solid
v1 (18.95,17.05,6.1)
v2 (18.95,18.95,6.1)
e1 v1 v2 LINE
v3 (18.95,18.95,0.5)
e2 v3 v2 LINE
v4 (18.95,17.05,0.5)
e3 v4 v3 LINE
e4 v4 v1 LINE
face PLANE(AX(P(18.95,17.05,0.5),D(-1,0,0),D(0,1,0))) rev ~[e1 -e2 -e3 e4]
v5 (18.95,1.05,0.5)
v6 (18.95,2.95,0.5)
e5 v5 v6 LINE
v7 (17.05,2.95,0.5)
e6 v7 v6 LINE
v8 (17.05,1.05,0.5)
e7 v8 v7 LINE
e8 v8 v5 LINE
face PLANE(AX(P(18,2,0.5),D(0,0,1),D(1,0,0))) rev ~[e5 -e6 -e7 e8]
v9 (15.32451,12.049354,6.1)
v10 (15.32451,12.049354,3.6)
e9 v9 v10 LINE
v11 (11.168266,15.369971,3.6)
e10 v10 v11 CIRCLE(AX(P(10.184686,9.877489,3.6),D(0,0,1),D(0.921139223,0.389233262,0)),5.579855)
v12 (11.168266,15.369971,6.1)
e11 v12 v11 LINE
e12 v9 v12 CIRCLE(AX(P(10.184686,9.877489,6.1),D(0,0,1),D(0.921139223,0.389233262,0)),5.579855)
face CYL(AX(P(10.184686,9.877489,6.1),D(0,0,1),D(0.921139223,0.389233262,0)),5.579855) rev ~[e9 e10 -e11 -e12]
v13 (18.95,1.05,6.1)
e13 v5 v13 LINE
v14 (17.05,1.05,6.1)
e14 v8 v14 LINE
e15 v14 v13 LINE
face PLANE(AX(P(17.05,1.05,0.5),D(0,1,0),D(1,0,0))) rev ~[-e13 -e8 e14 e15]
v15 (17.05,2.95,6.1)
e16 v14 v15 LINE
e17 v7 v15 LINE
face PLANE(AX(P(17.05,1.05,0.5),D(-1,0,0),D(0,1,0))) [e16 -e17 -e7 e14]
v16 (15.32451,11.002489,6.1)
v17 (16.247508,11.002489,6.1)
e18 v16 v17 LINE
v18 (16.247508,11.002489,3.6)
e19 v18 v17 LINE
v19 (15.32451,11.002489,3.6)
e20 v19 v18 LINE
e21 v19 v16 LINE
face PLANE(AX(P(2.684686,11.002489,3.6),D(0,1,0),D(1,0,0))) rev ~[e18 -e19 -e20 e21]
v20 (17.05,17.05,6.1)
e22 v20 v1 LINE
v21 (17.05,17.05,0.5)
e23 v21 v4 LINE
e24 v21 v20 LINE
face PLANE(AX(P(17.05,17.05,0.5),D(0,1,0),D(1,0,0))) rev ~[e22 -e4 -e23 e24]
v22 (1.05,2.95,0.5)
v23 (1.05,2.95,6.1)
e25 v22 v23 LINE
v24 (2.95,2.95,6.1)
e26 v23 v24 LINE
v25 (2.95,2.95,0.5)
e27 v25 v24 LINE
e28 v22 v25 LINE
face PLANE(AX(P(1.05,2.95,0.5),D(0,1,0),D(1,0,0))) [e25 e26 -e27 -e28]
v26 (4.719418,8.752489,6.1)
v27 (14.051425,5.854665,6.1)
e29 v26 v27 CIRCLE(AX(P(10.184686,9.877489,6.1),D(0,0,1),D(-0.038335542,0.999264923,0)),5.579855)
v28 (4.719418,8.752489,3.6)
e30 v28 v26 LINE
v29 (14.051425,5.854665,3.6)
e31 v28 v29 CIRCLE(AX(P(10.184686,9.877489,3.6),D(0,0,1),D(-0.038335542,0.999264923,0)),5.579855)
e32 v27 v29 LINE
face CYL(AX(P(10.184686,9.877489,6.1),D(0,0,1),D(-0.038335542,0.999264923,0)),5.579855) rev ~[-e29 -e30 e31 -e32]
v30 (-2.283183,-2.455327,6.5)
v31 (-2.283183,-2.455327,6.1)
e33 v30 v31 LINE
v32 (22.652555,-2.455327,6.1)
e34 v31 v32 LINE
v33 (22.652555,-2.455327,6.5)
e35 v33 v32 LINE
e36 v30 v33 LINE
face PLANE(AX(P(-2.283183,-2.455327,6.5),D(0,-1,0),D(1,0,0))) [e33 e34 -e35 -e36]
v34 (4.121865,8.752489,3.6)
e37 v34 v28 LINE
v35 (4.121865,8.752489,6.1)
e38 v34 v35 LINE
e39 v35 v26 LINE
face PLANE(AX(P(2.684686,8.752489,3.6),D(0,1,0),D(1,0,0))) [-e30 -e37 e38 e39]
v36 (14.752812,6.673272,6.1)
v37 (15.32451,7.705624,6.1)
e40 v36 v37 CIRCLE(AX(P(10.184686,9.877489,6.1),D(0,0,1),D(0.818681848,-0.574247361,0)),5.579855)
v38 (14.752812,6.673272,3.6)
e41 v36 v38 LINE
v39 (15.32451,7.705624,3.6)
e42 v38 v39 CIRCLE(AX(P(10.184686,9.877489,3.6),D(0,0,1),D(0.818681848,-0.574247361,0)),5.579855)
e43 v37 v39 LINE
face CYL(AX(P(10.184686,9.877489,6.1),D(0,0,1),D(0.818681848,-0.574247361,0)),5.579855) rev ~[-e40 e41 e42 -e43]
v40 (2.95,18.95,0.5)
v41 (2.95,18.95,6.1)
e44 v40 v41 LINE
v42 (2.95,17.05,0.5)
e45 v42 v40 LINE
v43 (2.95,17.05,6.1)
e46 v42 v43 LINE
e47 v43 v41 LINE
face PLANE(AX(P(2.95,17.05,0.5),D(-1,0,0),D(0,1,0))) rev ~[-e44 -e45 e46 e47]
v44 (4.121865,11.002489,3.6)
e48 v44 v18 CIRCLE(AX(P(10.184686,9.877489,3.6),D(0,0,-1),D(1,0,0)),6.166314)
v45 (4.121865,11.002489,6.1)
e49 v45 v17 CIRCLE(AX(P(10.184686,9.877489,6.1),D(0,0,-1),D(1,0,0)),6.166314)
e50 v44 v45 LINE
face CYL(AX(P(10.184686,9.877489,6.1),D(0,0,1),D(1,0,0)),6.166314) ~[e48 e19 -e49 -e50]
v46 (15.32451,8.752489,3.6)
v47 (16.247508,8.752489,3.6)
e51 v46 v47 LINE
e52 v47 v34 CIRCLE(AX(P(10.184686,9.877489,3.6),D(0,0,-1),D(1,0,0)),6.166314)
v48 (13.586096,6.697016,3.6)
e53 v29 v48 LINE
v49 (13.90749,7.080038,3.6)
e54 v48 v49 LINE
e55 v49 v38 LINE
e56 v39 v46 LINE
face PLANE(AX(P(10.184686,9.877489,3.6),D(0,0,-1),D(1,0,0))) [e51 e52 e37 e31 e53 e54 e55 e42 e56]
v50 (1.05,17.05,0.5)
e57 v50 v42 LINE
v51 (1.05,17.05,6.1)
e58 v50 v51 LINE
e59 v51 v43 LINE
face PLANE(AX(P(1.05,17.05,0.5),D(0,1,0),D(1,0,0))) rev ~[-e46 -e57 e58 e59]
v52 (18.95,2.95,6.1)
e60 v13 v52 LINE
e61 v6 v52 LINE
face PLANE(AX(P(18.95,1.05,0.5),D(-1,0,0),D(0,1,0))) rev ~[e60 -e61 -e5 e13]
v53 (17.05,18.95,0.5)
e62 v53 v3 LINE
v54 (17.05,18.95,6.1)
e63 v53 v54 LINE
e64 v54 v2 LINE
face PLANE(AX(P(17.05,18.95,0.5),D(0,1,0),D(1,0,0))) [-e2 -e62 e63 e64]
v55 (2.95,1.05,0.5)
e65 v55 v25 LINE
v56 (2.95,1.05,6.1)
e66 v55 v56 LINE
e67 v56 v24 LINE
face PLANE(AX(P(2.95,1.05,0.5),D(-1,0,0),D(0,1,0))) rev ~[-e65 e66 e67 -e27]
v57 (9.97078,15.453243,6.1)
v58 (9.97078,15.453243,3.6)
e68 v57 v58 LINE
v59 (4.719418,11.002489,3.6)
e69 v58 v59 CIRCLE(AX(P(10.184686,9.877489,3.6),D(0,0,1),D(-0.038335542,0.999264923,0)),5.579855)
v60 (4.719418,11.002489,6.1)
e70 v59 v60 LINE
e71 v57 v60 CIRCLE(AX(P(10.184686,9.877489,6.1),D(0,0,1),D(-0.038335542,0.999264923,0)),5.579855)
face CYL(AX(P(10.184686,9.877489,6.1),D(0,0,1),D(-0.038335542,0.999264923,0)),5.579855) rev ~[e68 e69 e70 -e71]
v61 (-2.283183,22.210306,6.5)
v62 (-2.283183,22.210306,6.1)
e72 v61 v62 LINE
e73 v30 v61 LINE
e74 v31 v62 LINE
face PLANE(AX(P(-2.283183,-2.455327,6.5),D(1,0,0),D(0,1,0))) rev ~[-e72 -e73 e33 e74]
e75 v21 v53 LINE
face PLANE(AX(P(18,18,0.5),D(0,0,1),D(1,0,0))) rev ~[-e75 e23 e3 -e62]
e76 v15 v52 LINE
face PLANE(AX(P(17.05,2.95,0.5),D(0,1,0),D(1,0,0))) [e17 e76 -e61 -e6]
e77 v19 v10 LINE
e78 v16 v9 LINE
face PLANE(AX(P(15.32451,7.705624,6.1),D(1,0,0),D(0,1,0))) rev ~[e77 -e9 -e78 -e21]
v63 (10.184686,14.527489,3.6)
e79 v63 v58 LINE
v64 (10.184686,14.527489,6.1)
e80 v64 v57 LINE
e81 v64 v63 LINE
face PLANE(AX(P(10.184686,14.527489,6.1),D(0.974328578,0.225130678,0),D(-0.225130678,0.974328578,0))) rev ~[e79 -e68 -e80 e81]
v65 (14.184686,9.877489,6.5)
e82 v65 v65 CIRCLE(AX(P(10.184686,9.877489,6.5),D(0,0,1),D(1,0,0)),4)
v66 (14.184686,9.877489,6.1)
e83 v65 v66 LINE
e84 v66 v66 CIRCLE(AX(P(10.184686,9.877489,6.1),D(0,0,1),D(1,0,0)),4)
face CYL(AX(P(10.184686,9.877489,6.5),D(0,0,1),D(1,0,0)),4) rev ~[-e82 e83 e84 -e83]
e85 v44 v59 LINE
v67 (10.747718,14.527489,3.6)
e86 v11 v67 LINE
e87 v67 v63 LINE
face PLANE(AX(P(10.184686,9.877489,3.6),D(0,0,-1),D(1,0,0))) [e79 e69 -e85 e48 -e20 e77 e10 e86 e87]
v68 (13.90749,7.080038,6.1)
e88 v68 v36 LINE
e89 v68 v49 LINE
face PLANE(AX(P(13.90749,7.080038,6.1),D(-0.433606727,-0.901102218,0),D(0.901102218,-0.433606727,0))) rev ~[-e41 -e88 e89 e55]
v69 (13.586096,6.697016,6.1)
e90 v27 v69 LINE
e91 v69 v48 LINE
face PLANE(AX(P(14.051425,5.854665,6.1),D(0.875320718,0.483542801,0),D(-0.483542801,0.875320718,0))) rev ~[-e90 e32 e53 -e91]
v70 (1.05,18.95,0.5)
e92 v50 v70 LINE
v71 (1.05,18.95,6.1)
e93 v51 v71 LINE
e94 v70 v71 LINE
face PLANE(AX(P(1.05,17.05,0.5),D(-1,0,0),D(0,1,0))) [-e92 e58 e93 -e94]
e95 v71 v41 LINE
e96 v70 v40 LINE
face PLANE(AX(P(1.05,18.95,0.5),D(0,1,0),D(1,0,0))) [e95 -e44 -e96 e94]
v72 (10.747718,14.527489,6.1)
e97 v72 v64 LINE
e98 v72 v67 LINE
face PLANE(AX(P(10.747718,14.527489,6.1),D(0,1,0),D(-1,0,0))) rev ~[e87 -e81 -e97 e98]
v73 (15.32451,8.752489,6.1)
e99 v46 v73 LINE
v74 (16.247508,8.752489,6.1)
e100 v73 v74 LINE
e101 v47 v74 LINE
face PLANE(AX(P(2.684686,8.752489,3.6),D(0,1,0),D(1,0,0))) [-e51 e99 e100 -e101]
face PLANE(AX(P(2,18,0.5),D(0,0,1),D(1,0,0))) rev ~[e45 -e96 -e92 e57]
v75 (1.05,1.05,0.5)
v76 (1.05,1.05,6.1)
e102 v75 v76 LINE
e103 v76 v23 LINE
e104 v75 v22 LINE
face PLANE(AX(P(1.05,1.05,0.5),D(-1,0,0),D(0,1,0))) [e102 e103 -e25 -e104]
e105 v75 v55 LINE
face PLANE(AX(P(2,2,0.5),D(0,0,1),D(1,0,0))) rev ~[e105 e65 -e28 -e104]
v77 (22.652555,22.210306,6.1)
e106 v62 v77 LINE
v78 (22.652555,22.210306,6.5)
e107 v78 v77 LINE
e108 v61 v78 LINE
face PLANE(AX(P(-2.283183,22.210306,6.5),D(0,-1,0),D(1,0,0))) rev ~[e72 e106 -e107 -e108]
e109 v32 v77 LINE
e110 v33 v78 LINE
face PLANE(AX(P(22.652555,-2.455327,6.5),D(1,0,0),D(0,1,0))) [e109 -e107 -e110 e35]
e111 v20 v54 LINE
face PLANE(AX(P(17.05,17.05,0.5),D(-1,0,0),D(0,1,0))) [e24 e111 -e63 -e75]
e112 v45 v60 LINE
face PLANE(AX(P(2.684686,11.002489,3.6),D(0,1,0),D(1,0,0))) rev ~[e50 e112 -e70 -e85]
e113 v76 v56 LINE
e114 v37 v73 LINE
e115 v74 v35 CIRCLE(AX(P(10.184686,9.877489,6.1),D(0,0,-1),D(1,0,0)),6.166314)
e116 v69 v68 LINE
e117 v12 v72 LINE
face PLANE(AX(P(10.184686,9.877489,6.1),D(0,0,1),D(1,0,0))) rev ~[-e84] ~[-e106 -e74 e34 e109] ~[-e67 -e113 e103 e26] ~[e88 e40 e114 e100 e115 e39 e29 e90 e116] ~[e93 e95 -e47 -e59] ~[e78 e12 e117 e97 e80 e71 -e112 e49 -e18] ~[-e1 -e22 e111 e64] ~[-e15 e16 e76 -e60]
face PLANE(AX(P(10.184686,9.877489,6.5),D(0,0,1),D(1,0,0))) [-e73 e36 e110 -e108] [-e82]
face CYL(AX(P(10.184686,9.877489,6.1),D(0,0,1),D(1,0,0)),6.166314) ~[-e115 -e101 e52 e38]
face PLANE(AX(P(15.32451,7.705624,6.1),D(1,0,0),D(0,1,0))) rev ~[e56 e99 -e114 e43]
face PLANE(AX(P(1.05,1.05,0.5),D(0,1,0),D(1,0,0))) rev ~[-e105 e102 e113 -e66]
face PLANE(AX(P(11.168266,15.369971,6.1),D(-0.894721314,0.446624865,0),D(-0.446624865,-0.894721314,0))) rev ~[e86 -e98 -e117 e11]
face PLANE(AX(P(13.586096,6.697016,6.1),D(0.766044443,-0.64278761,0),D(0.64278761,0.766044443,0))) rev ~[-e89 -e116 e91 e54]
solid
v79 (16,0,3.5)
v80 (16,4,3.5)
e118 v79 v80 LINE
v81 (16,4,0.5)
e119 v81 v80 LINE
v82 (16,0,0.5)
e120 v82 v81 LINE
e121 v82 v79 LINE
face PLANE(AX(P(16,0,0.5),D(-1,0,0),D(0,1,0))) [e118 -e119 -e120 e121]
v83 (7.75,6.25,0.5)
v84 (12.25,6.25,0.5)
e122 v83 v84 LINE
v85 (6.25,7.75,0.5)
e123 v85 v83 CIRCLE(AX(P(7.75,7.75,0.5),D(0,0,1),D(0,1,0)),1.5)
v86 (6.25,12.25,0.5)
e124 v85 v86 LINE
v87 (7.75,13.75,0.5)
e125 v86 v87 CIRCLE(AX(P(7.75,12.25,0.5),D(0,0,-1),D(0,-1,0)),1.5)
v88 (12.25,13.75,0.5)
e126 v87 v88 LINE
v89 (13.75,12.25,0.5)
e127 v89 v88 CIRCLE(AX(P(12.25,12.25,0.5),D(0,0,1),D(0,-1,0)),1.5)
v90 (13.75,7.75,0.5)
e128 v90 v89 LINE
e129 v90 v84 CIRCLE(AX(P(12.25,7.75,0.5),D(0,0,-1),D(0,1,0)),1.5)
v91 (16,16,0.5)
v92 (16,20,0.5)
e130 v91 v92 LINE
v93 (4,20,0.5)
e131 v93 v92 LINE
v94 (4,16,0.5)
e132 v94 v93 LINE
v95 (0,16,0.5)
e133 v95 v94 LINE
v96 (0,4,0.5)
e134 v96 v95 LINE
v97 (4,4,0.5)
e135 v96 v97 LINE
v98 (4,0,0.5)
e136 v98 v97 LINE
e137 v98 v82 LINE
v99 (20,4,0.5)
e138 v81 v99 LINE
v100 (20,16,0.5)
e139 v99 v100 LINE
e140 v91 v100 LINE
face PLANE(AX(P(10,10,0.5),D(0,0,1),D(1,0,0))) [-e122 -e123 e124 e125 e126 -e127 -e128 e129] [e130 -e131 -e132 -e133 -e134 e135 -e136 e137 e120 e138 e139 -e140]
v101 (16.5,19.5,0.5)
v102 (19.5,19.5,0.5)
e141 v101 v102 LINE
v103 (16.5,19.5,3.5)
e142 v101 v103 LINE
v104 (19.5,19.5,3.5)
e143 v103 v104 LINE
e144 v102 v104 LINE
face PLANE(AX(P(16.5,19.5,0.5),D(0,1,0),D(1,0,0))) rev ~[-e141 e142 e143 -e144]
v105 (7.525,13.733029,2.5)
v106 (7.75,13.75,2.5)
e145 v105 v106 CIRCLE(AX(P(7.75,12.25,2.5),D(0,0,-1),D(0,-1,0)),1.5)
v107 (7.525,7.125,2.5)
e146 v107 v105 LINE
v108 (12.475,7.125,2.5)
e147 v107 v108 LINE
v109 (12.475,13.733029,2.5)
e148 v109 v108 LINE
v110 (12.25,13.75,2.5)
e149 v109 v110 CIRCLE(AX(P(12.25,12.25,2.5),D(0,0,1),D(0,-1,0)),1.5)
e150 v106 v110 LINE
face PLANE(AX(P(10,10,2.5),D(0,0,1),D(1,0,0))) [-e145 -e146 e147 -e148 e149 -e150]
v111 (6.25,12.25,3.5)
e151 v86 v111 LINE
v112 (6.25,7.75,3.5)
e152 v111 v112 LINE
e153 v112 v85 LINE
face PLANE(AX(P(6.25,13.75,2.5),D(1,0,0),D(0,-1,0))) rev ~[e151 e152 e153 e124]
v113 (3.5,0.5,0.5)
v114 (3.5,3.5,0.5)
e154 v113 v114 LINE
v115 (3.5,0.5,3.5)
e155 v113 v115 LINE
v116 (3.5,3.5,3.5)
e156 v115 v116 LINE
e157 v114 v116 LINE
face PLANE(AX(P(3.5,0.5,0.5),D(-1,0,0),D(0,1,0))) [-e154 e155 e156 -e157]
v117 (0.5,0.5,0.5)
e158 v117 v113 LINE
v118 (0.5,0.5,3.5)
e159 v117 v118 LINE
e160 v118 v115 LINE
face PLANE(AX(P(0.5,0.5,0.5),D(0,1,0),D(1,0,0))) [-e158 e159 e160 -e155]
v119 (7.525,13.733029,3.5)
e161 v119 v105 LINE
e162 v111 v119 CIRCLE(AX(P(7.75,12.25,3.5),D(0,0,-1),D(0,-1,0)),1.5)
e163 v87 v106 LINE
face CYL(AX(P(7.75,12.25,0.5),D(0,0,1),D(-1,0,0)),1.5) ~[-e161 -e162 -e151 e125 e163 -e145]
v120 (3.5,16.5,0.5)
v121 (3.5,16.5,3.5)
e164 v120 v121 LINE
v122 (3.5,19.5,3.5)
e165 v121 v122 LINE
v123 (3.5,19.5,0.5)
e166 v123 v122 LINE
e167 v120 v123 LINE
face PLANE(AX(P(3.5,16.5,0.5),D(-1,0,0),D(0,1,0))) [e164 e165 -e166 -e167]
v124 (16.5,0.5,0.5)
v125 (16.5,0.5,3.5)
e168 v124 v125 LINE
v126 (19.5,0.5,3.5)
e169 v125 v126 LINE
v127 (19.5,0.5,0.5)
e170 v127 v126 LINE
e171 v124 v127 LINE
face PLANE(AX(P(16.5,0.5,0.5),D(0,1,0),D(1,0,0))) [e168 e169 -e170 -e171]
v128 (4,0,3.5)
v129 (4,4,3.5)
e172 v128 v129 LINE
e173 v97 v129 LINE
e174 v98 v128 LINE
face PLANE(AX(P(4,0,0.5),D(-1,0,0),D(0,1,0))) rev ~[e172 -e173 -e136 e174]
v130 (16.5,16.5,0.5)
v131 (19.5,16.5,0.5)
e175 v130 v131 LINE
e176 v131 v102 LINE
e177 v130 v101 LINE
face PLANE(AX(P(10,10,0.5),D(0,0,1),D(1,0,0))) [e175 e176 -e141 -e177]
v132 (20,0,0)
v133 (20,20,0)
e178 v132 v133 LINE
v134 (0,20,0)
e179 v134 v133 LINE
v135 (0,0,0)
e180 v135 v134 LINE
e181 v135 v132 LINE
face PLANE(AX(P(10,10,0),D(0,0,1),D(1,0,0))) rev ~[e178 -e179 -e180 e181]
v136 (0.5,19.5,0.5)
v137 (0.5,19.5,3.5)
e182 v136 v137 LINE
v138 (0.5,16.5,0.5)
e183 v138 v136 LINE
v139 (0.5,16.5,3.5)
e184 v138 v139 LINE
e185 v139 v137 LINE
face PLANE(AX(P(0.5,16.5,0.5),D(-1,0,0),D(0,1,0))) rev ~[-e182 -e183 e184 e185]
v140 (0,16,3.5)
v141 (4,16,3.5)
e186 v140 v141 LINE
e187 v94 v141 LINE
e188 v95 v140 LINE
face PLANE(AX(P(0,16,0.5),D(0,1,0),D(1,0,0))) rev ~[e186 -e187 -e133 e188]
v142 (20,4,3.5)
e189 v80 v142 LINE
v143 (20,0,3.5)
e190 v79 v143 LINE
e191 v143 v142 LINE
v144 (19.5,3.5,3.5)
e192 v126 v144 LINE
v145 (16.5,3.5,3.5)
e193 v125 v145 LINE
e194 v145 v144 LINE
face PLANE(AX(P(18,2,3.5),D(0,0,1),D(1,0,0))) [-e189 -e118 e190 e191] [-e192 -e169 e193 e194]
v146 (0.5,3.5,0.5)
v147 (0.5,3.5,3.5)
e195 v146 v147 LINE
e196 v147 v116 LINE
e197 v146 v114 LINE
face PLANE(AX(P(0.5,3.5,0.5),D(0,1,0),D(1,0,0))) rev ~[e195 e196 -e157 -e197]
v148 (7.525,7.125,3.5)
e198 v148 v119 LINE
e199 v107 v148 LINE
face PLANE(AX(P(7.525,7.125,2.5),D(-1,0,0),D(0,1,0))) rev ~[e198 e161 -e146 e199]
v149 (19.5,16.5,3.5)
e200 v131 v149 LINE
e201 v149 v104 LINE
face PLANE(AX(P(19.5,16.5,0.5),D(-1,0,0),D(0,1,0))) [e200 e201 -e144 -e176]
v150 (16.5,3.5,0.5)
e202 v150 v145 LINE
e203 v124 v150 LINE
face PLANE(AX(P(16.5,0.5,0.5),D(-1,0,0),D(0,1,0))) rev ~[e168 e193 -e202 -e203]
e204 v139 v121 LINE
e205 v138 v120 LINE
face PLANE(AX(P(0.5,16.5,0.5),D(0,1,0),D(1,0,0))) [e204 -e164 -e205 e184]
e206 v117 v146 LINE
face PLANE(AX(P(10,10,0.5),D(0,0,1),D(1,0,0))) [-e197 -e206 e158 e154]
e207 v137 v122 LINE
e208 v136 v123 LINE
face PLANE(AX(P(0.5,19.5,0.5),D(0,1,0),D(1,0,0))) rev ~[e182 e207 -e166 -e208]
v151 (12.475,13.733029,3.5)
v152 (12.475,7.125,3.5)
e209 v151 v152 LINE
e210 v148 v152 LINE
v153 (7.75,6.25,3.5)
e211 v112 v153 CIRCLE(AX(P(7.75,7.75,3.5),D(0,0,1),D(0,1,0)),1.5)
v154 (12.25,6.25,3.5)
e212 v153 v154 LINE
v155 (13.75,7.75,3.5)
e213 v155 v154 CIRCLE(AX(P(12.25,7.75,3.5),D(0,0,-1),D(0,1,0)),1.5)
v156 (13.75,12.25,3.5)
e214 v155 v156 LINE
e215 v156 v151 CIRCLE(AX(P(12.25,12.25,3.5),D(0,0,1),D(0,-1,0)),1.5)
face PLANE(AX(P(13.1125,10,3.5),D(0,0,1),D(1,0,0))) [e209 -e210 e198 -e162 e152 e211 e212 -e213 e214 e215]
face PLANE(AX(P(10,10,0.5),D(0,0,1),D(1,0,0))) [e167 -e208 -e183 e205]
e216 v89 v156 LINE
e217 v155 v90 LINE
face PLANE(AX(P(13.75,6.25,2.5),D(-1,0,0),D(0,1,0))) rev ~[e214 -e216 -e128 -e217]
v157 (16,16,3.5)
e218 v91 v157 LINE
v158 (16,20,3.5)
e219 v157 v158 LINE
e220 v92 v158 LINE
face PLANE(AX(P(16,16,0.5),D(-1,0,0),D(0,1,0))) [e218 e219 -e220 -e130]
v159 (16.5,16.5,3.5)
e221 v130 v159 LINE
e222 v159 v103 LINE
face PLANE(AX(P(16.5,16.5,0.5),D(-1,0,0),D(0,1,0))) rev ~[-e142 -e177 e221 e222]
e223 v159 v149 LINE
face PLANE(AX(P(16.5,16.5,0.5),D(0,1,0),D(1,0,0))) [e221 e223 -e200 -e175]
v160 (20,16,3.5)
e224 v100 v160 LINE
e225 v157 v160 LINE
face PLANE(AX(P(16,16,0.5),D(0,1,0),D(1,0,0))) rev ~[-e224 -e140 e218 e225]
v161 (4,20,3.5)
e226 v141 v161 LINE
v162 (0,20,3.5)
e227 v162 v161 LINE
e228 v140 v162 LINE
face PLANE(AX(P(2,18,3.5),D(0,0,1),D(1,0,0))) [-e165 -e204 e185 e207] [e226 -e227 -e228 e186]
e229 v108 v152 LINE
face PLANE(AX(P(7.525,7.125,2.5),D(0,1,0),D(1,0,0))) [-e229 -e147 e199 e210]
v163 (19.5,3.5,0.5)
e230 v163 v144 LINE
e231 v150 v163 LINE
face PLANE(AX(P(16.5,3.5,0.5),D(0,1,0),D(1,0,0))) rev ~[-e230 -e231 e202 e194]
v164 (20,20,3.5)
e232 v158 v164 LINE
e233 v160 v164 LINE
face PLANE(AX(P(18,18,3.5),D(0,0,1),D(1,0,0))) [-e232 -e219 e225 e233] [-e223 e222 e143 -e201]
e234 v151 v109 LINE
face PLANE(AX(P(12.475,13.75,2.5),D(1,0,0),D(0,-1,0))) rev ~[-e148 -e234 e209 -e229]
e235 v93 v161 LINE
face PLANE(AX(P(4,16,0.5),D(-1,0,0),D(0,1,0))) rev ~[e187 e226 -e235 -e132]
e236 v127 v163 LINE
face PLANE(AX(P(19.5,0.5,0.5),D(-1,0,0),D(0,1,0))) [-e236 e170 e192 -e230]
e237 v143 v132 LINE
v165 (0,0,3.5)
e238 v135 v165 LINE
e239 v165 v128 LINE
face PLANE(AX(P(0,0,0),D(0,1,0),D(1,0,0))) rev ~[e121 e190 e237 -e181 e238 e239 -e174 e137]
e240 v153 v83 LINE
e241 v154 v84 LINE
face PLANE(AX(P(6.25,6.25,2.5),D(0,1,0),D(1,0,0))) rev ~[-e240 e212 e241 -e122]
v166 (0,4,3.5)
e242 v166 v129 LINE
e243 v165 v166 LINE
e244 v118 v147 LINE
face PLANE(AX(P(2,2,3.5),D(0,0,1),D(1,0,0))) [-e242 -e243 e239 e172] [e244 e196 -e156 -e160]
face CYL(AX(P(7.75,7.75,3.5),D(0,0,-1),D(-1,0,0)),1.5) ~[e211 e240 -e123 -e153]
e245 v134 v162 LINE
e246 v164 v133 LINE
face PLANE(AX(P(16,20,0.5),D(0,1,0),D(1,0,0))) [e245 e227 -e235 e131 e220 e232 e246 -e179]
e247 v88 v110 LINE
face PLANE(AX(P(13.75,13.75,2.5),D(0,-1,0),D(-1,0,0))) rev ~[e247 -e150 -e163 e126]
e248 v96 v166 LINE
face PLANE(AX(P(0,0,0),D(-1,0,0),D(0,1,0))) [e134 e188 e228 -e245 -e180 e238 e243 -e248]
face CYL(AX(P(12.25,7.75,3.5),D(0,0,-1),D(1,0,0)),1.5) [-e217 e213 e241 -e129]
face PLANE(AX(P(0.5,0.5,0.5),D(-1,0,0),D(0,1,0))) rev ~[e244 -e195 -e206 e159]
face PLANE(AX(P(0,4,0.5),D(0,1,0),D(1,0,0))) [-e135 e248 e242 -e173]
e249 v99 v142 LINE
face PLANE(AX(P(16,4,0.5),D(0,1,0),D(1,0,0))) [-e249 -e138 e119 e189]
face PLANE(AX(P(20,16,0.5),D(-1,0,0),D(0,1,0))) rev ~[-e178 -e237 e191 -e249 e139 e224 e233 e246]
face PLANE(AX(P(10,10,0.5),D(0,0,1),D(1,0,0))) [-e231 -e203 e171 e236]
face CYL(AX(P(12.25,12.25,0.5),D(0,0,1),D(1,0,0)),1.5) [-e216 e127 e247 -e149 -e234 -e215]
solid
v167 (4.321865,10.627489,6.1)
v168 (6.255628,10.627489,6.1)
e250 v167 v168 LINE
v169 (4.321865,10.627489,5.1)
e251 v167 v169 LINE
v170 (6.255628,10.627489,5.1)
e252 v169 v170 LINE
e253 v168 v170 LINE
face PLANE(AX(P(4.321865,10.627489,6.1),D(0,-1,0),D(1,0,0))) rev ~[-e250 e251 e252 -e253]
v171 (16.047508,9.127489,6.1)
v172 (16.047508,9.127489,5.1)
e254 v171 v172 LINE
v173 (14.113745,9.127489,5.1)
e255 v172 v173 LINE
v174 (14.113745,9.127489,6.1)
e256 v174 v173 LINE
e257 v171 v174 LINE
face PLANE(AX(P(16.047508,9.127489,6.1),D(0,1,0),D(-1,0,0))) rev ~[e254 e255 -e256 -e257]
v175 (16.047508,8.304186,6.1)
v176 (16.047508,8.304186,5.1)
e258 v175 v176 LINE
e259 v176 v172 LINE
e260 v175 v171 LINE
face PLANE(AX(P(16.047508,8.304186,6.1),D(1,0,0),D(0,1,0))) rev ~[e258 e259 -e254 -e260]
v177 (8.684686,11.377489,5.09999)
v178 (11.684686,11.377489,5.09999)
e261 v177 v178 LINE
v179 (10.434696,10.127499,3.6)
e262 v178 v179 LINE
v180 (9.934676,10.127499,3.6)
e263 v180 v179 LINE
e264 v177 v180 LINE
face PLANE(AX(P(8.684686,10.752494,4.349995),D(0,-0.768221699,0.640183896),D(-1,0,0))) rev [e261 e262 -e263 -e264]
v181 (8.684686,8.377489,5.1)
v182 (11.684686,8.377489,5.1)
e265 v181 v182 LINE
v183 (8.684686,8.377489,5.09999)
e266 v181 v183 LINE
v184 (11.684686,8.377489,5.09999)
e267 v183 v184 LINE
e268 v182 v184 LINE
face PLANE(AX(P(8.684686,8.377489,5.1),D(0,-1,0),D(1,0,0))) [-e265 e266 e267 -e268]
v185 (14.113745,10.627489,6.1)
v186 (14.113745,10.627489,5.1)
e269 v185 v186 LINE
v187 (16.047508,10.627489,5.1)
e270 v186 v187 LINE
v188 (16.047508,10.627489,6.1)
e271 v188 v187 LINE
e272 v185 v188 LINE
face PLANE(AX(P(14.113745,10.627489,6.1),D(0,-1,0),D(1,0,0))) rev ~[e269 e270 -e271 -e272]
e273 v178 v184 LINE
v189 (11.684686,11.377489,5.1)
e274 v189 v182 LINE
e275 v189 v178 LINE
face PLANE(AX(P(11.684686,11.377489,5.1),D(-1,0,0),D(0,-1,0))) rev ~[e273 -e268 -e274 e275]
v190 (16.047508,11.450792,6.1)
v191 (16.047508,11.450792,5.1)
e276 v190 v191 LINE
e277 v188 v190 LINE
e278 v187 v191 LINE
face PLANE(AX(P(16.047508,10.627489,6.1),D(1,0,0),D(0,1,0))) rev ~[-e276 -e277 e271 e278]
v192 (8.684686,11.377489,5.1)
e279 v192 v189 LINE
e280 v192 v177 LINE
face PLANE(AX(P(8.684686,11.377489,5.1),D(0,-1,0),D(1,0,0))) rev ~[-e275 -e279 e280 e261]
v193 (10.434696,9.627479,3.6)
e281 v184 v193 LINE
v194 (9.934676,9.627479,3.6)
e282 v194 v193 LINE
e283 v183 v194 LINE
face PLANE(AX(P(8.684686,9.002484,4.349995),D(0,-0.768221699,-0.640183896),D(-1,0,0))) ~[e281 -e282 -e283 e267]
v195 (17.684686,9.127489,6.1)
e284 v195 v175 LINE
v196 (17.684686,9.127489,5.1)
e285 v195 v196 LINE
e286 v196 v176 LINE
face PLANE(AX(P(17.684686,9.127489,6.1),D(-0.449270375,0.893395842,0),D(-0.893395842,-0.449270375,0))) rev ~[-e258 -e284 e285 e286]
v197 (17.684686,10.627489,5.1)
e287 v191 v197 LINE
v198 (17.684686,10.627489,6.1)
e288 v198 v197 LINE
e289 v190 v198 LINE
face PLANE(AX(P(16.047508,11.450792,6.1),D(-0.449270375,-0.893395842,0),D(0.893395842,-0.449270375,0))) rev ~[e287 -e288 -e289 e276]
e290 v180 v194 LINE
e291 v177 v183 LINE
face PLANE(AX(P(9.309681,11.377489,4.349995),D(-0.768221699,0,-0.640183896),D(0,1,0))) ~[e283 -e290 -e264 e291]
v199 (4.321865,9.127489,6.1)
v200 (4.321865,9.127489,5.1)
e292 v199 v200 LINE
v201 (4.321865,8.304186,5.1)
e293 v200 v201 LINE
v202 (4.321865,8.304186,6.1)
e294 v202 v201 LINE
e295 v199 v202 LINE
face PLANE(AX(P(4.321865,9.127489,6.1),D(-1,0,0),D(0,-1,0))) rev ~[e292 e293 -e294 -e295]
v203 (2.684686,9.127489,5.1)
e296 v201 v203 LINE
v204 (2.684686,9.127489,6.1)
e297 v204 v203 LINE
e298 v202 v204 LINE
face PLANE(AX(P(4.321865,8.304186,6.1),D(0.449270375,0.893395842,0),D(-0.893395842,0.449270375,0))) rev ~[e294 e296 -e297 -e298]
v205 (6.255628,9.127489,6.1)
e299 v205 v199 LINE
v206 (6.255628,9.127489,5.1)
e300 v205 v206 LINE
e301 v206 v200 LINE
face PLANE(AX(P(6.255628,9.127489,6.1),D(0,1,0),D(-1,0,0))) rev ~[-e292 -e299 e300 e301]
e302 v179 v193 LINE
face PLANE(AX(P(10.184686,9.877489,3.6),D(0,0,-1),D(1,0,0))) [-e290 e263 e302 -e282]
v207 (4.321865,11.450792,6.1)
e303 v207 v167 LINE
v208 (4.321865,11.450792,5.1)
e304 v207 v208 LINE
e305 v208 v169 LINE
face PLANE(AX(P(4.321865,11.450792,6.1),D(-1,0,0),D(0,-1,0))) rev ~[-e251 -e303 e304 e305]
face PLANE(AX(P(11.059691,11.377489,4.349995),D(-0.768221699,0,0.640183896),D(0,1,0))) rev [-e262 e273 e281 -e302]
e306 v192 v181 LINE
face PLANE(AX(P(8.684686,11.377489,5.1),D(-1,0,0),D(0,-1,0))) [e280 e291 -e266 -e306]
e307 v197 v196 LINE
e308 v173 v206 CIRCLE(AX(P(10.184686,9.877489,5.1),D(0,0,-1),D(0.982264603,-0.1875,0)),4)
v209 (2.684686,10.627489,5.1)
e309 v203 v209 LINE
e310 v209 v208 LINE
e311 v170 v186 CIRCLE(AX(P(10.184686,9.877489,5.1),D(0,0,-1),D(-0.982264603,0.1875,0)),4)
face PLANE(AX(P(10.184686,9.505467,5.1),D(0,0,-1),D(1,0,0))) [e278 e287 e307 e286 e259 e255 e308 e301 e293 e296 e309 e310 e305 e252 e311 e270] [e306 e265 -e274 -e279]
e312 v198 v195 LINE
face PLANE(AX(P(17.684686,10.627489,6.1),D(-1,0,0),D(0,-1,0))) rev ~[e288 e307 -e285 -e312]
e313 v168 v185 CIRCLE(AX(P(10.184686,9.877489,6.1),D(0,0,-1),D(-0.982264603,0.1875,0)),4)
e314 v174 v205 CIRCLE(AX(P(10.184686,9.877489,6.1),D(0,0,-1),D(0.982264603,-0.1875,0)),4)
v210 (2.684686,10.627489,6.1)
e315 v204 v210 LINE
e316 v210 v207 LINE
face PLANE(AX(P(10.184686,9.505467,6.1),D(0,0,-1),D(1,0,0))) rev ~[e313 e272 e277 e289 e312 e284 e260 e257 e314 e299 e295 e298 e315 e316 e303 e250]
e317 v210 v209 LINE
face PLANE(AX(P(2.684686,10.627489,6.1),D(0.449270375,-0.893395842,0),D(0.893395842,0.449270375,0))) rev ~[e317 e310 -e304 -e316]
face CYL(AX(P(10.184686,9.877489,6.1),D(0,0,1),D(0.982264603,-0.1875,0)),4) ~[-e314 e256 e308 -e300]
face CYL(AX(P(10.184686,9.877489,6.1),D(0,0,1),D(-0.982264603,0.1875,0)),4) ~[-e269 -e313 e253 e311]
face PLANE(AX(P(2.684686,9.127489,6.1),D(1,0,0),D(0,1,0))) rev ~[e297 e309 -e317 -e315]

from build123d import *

# Parameters (mm, degrees)
F0_W      = 20
F0_H      = 20
F1_DEPTH  = 0.5
F2_W      = 4
F2_H      = 4
F2_W_2    = 3
F2_H_2    = 3
F3_DEPTH  = 3
F2_W_3    = 1.9
F2_H_3    = 1.9
F4_DEPTH  = 6
F5_W      = 24.9357379507
F5_H      = 24.6656327508
F5_W_2    = 1.9
F5_H_2    = 1.9
F6_DEPTH  = 0.4
F7_R      = 4
F8_DEPTH  = 25
F9_R      = 6.1663142181
F10_DEPTH = 2.5
F11_W     = 7.5
F11_H     = 7.5
F12_DEPTH = 2
F13_W     = 4.95
F13_H     = 0.875
F14_DEPTH = 1
F15_R     = 1.5
F16_W     = 15
F16_H     = 2.25
F17_DEPTH = 2.5
F18_W     = 1.6371783766
F18_H     = 0.75
F19_DEPTH = 1
F20_W     = 3
F20_H     = 3
F21_DEPTH = 1.5
F22_SIZE2 = 1.24999
F22_SIZE  = 1.49999


# Not quite as in the source:
# - a fillet or chamfer is up to 0.001 mm smaller than in the source, because OpenCascade refuses the exact size
# - a feature names something its author has since deleted; it is built from what else it names


with BuildPart() as f1:
    # F0 (on Top) → F1 (new body)
    with BuildSketch(Plane.XY):
        with Locations((10, 10)):
            Rectangle(F0_W, F0_H)
    extrude(amount=F1_DEPTH)

    # F2 (on face) → F3 (join)
    with BuildSketch(Plane.XY.offset(0.5)):
        with Locations((18, 18)):
            Rectangle(F2_W, F2_H)
        with Locations((18, 18)):
            Rectangle(F2_W_2, F2_H_2, mode=Mode.SUBTRACT)
        with Locations((2, 18)):
            Rectangle(F2_W, F2_H)
        with Locations((2, 18)):
            Rectangle(F2_W_2, F2_H_2, mode=Mode.SUBTRACT)
        with Locations((2, 2)):
            Rectangle(F2_W, F2_H)
        with Locations((2, 2)):
            Rectangle(F2_W_2, F2_H_2, mode=Mode.SUBTRACT)
        with Locations((18, 2)):
            Rectangle(F2_W, F2_H)
        with Locations((18, 2)):
            Rectangle(F2_W_2, F2_H_2, mode=Mode.SUBTRACT)
    extrude(amount=F3_DEPTH)

    # F11 (on face) → F12 (join)
    with BuildSketch(Plane.XY.offset(0.5)):
        with Locations((10, 10)):
            Rectangle(F11_W, F11_H)
    extrude(amount=F12_DEPTH)

    # F13 (on face) → F14 (join)
    with BuildSketch(Plane.XY.offset(2.5)):
        Polygon((12.475, 7.125), (12.475, 6.25), (13.75, 6.25), (13.75, 13.75), (12.475, 13.75), align=None)
        with Locations((10, 6.6875)):
            Rectangle(F13_W, F13_H)
        Polygon((6.25, 6.25), (7.525, 6.25), (7.525, 7.125), (7.525, 13.75), (6.25, 13.75), align=None)
    extrude(amount=F14_DEPTH)

    # F15
    f15_edges = [f1.edges().sort_by_distance(p)[0] for p in [
        (6.25, 13.75, 2),
        (13.75, 13.75, 2),
        (13.75, 6.25, 2),
        (6.25, 6.25, 2),
    ]]
    fillet(f15_edges, radius=F15_R)


with BuildPart() as f4:
    # F2 (on face) → F4 (new body)
    with BuildSketch(Plane.XY.offset(0.5)):
        with Locations((2, 18)):
            Rectangle(F2_W_3, F2_H_3)
    extrude(amount=F4_DEPTH)



with BuildPart() as f4b:
    # F2 (on face) → F4, piece 2 (new body)
    with BuildSketch(Plane.XY.offset(0.5)):
        with Locations((18, 18)):
            Rectangle(F2_W_3, F2_H_3)
    extrude(amount=F4_DEPTH)


with BuildPart() as f4c:
    # F2 (on face) → F4, piece 3 (new body)
    with BuildSketch(Plane.XY.offset(0.5)):
        with Locations((18, 2)):
            Rectangle(F2_W_3, F2_H_3)
    extrude(amount=F4_DEPTH)


with BuildPart() as f4d:
    # F2 (on face) → F4, piece 4 (new body)
    with BuildSketch(Plane.XY.offset(0.5)):
        with Locations((2, 2)):
            Rectangle(F2_W_3, F2_H_3)
    extrude(amount=F4_DEPTH)


with BuildPart() as f4_1:
    add(f4.part)

    add(f4b.part)  # F6 merges F4b

    add(f4c.part)  # F6 merges F4c

    add(f4d.part)  # F6 merges F4d
    # F5 (on face) → F6 (join)
    with BuildSketch(Plane.XY.offset(6.5)):
        with Locations((10.1846862817, 9.8774891812)):
            Rectangle(F5_W, F5_H)
        with Locations((18, 18)):
            Rectangle(F5_W_2, F5_H_2, mode=Mode.SUBTRACT)
    extrude(amount=-F6_DEPTH)

    # F7 (on face) → F8 (cut)
    with BuildSketch(Plane.XY.offset(6.5)):
        with Locations((10.1846862817, 9.8774891812)):
            Circle(F7_R)
    extrude(amount=-F8_DEPTH, mode=Mode.SUBTRACT)

    # F9 (on face) → F10 (join)
    with BuildSketch(Plane(origin=(0, 0, 6.1), x_dir=(1, 0, 0), z_dir=(0, 0, -1))):
        with Locations((10.1846862817, -9.8774891812)):
            Circle(F9_R)
        with BuildLine():
            ThreePointArc((11.1682663292, -15.369970548), (10.571768696, -15.4439017135), (9.970779517, -15.4532425089))
            ThreePointArc((9.970779517, -15.4532425089), (5.0496141216, -7.6944144723), (14.0514253314, -5.8546654968))
            ThreePointArc((14.0514253314, -5.8546654968), (14.4219337589, -6.2469912689), (14.7528122455, -6.6732722014))
            ThreePointArc((14.7528122455, -6.6732722014), (15.066029035, -7.1742921482), (15.3245095344, -7.7056240368))
            ThreePointArc((15.3245095344, -7.7056240368), (15.6534269731, -8.7694925543), (15.7645412327, -9.8774891812))
            ThreePointArc((15.7645412327, -9.8774891812), (15.6534269731, -10.9854858082), (15.3245095344, -12.0493543256))
            ThreePointArc((15.3245095344, -12.0493543256), (13.6675931163, -14.2368631336), (11.1682663292, -15.369970548))
        make_face(mode=Mode.SUBTRACT)
        with BuildLine():
            ThreePointArc((15.7645412327, -9.8774891812), (15.6534269731, -8.7694925543), (15.3245095344, -7.7056240368))
            Line((15.3245095344, -7.7056240368), (15.3245095344, -12.0493543256))
            ThreePointArc((15.3245095344, -12.0493543256), (15.6534269731, -10.9854858082), (15.7645412327, -9.8774891812))
        make_face()
        with BuildLine():
            Line((10.7477184775, -14.5274891812), (10.1846862817, -14.5274891812))
            Line((10.1846862817, -14.5274891812), (9.970779517, -15.4532425089))
            ThreePointArc((9.970779517, -15.4532425089), (10.571768696, -15.4439017135), (11.1682663292, -15.369970548))
            Line((11.1682663292, -15.369970548), (10.7477184775, -14.5274891812))
        make_face()
        with BuildLine():
            Line((13.5860960398, -6.6970156854), (13.7467929422, -6.8885267962))
            Line((13.7467929422, -6.8885267962), (13.9074898446, -7.080037907))
            Line((13.9074898446, -7.080037907), (14.7528122455, -6.6732722014))
            ThreePointArc((14.7528122455, -6.6732722014), (14.4219337589, -6.2469912689), (14.0514253314, -5.8546654968))
            Line((14.0514253314, -5.8546654968), (13.5860960398, -6.6970156854))
        make_face()
    extrude(amount=F10_DEPTH)

    # F16 (on face) → F17 (cut, through all)
    with BuildSketch(Plane(origin=(0, 0, 3.6), x_dir=(1, 0, 0), z_dir=(0, 0, -1))):
        with Locations((10.1846862817, -9.8774891812)):
            Rectangle(F16_W, F16_H)
    extrude(amount=-F17_DEPTH, mode=Mode.SUBTRACT)


with BuildPart() as f19:
    # F18 (on face) → F19 (new body)
    with BuildSketch(Plane(origin=(0, 0, 6.1), x_dir=(1, 0, 0), z_dir=(0, 0, -1))):
        with BuildLine():
            Line((10.1846862817, -9.8774891812), (14.1846862817, -9.8774891812))
            ThreePointArc((14.1846862817, -9.8774891812), (14.1669113912, -9.5008153472), (14.1137446931, -9.1274891812))
            Line((14.1137446931, -9.1274891812), (6.2556278703, -9.1274891812))
            ThreePointArc((6.2556278703, -9.1274891812), (6.2024611722, -9.5008153472), (6.1846862817, -9.8774891812))
            Line((6.1846862817, -9.8774891812), (10.1846862817, -9.8774891812))
        make_face()
        with BuildLine():
            Line((16.0475079051, -9.8774891812), (14.1846862817, -9.8774891812))
            ThreePointArc((14.1846862817, -9.8774891812), (14.1669113912, -10.2541630153), (14.1137446931, -10.6274891812))
            Line((14.1137446931, -10.6274891812), (16.0475079051, -10.6274891812))
            Line((16.0475079051, -10.6274891812), (16.0475079051, -9.8774891812))
        make_face()
        with BuildLine():
            ThreePointArc((14.1137446931, -10.6274891812), (14.1669113912, -10.2541630153), (14.1846862817, -9.8774891812))
            Line((14.1846862817, -9.8774891812), (10.1846862817, -9.8774891812))
            Line((10.1846862817, -9.8774891812), (6.1846862817, -9.8774891812))
            ThreePointArc((6.1846862817, -9.8774891812), (6.2024611722, -10.2541630153), (6.2556278703, -10.6274891812))
            Line((6.2556278703, -10.6274891812), (14.1137446931, -10.6274891812))
        make_face()
        with BuildLine():
            ThreePointArc((14.1137446931, -9.1274891812), (14.1669113912, -9.5008153472), (14.1846862817, -9.8774891812))
            Line((14.1846862817, -9.8774891812), (16.0475079051, -9.8774891812))
            Line((16.0475079051, -9.8774891812), (16.0475079051, -9.1274891812))
            Line((16.0475079051, -9.1274891812), (14.1137446931, -9.1274891812))
        make_face()
        with BuildLine():
            Line((6.2556278703, -9.1274891812), (14.1137446931, -9.1274891812))
            ThreePointArc((14.1137446931, -9.1274891812), (10.1846862817, -5.8774891812), (6.2556278703, -9.1274891812))
        make_face()
        with BuildLine():
            ThreePointArc((6.2556278703, -10.6274891812), (10.1846862817, -13.8774891812), (14.1137446931, -10.6274891812))
            Line((14.1137446931, -10.6274891812), (6.2556278703, -10.6274891812))
        make_face()
        with Locations((16.8660970934, -9.5024891812)):
            Rectangle(F18_W, F18_H)
        with Locations((16.8660970934, -10.2524891812)):
            Rectangle(F18_W, F18_H)
        with BuildLine():
            ThreePointArc((6.1846862817, -9.8774891812), (6.2024611722, -9.5008153472), (6.2556278703, -9.1274891812))
            Line((6.2556278703, -9.1274891812), (4.3218646583, -9.1274891812))
            Line((4.3218646583, -9.1274891812), (4.3218646583, -9.8774891812))
            Line((4.3218646583, -9.8774891812), (6.1846862817, -9.8774891812))
        make_face()
        Polygon((16.0475079051, -8.3041858837), (16.0475079051, -9.1274891812), (17.6846862817, -9.1274891812), align=None)
        with BuildLine():
            Line((4.3218646583, -10.6274891812), (6.2556278703, -10.6274891812))
            ThreePointArc((6.2556278703, -10.6274891812), (6.2024611722, -10.2541630153), (6.1846862817, -9.8774891812))
            Line((6.1846862817, -9.8774891812), (4.3218646583, -9.8774891812))
            Line((4.3218646583, -9.8774891812), (4.3218646583, -10.6274891812))
        make_face()
        Polygon((17.6846862817, -10.6274891812), (16.0475079051, -10.6274891812), (16.0475079051, -11.4507924787), align=None)
        with Locations((3.50327547, -9.5024891812)):
            Rectangle(F18_W, F18_H)
        Polygon((2.6846862817, -9.1274891812), (4.3218646583, -9.1274891812), (4.3218646583, -8.3041858837), align=None)
        Polygon((4.3218646583, -11.4507924787), (4.3218646583, -10.6274891812), (2.6846862817, -10.6274891812), align=None)
        with Locations((3.50327547, -10.2524891812)):
            Rectangle(F18_W, F18_H)
    extrude(amount=F19_DEPTH)

    # F20 (on face) → F21 (join)
    with BuildSketch(Plane(origin=(0, 0, 5.1), x_dir=(1, 0, 0), z_dir=(0, 0, -1))):
        with Locations((10.1846862817, -9.8774891812)):
            Rectangle(F20_W, F20_H)
    extrude(amount=F21_DEPTH)

    # F22 (size 1.5 and 1.25 in the source; OpenCascade refuses exactly that, so slightly less here)
    f22_edges = [f19.edges().sort_by_distance(p)[0] for p in [
        (10.184686, 8.377489, 3.6),
        (8.684686, 9.877489, 3.6),
        (10.184686, 11.377489, 3.6),
        (11.684686, 9.877489, 3.6),
    ]]
    chamfer(f22_edges, length=F22_SIZE, length2=F22_SIZE2)


solid = Compound([f1.part, f4_1.part, f19.part])
